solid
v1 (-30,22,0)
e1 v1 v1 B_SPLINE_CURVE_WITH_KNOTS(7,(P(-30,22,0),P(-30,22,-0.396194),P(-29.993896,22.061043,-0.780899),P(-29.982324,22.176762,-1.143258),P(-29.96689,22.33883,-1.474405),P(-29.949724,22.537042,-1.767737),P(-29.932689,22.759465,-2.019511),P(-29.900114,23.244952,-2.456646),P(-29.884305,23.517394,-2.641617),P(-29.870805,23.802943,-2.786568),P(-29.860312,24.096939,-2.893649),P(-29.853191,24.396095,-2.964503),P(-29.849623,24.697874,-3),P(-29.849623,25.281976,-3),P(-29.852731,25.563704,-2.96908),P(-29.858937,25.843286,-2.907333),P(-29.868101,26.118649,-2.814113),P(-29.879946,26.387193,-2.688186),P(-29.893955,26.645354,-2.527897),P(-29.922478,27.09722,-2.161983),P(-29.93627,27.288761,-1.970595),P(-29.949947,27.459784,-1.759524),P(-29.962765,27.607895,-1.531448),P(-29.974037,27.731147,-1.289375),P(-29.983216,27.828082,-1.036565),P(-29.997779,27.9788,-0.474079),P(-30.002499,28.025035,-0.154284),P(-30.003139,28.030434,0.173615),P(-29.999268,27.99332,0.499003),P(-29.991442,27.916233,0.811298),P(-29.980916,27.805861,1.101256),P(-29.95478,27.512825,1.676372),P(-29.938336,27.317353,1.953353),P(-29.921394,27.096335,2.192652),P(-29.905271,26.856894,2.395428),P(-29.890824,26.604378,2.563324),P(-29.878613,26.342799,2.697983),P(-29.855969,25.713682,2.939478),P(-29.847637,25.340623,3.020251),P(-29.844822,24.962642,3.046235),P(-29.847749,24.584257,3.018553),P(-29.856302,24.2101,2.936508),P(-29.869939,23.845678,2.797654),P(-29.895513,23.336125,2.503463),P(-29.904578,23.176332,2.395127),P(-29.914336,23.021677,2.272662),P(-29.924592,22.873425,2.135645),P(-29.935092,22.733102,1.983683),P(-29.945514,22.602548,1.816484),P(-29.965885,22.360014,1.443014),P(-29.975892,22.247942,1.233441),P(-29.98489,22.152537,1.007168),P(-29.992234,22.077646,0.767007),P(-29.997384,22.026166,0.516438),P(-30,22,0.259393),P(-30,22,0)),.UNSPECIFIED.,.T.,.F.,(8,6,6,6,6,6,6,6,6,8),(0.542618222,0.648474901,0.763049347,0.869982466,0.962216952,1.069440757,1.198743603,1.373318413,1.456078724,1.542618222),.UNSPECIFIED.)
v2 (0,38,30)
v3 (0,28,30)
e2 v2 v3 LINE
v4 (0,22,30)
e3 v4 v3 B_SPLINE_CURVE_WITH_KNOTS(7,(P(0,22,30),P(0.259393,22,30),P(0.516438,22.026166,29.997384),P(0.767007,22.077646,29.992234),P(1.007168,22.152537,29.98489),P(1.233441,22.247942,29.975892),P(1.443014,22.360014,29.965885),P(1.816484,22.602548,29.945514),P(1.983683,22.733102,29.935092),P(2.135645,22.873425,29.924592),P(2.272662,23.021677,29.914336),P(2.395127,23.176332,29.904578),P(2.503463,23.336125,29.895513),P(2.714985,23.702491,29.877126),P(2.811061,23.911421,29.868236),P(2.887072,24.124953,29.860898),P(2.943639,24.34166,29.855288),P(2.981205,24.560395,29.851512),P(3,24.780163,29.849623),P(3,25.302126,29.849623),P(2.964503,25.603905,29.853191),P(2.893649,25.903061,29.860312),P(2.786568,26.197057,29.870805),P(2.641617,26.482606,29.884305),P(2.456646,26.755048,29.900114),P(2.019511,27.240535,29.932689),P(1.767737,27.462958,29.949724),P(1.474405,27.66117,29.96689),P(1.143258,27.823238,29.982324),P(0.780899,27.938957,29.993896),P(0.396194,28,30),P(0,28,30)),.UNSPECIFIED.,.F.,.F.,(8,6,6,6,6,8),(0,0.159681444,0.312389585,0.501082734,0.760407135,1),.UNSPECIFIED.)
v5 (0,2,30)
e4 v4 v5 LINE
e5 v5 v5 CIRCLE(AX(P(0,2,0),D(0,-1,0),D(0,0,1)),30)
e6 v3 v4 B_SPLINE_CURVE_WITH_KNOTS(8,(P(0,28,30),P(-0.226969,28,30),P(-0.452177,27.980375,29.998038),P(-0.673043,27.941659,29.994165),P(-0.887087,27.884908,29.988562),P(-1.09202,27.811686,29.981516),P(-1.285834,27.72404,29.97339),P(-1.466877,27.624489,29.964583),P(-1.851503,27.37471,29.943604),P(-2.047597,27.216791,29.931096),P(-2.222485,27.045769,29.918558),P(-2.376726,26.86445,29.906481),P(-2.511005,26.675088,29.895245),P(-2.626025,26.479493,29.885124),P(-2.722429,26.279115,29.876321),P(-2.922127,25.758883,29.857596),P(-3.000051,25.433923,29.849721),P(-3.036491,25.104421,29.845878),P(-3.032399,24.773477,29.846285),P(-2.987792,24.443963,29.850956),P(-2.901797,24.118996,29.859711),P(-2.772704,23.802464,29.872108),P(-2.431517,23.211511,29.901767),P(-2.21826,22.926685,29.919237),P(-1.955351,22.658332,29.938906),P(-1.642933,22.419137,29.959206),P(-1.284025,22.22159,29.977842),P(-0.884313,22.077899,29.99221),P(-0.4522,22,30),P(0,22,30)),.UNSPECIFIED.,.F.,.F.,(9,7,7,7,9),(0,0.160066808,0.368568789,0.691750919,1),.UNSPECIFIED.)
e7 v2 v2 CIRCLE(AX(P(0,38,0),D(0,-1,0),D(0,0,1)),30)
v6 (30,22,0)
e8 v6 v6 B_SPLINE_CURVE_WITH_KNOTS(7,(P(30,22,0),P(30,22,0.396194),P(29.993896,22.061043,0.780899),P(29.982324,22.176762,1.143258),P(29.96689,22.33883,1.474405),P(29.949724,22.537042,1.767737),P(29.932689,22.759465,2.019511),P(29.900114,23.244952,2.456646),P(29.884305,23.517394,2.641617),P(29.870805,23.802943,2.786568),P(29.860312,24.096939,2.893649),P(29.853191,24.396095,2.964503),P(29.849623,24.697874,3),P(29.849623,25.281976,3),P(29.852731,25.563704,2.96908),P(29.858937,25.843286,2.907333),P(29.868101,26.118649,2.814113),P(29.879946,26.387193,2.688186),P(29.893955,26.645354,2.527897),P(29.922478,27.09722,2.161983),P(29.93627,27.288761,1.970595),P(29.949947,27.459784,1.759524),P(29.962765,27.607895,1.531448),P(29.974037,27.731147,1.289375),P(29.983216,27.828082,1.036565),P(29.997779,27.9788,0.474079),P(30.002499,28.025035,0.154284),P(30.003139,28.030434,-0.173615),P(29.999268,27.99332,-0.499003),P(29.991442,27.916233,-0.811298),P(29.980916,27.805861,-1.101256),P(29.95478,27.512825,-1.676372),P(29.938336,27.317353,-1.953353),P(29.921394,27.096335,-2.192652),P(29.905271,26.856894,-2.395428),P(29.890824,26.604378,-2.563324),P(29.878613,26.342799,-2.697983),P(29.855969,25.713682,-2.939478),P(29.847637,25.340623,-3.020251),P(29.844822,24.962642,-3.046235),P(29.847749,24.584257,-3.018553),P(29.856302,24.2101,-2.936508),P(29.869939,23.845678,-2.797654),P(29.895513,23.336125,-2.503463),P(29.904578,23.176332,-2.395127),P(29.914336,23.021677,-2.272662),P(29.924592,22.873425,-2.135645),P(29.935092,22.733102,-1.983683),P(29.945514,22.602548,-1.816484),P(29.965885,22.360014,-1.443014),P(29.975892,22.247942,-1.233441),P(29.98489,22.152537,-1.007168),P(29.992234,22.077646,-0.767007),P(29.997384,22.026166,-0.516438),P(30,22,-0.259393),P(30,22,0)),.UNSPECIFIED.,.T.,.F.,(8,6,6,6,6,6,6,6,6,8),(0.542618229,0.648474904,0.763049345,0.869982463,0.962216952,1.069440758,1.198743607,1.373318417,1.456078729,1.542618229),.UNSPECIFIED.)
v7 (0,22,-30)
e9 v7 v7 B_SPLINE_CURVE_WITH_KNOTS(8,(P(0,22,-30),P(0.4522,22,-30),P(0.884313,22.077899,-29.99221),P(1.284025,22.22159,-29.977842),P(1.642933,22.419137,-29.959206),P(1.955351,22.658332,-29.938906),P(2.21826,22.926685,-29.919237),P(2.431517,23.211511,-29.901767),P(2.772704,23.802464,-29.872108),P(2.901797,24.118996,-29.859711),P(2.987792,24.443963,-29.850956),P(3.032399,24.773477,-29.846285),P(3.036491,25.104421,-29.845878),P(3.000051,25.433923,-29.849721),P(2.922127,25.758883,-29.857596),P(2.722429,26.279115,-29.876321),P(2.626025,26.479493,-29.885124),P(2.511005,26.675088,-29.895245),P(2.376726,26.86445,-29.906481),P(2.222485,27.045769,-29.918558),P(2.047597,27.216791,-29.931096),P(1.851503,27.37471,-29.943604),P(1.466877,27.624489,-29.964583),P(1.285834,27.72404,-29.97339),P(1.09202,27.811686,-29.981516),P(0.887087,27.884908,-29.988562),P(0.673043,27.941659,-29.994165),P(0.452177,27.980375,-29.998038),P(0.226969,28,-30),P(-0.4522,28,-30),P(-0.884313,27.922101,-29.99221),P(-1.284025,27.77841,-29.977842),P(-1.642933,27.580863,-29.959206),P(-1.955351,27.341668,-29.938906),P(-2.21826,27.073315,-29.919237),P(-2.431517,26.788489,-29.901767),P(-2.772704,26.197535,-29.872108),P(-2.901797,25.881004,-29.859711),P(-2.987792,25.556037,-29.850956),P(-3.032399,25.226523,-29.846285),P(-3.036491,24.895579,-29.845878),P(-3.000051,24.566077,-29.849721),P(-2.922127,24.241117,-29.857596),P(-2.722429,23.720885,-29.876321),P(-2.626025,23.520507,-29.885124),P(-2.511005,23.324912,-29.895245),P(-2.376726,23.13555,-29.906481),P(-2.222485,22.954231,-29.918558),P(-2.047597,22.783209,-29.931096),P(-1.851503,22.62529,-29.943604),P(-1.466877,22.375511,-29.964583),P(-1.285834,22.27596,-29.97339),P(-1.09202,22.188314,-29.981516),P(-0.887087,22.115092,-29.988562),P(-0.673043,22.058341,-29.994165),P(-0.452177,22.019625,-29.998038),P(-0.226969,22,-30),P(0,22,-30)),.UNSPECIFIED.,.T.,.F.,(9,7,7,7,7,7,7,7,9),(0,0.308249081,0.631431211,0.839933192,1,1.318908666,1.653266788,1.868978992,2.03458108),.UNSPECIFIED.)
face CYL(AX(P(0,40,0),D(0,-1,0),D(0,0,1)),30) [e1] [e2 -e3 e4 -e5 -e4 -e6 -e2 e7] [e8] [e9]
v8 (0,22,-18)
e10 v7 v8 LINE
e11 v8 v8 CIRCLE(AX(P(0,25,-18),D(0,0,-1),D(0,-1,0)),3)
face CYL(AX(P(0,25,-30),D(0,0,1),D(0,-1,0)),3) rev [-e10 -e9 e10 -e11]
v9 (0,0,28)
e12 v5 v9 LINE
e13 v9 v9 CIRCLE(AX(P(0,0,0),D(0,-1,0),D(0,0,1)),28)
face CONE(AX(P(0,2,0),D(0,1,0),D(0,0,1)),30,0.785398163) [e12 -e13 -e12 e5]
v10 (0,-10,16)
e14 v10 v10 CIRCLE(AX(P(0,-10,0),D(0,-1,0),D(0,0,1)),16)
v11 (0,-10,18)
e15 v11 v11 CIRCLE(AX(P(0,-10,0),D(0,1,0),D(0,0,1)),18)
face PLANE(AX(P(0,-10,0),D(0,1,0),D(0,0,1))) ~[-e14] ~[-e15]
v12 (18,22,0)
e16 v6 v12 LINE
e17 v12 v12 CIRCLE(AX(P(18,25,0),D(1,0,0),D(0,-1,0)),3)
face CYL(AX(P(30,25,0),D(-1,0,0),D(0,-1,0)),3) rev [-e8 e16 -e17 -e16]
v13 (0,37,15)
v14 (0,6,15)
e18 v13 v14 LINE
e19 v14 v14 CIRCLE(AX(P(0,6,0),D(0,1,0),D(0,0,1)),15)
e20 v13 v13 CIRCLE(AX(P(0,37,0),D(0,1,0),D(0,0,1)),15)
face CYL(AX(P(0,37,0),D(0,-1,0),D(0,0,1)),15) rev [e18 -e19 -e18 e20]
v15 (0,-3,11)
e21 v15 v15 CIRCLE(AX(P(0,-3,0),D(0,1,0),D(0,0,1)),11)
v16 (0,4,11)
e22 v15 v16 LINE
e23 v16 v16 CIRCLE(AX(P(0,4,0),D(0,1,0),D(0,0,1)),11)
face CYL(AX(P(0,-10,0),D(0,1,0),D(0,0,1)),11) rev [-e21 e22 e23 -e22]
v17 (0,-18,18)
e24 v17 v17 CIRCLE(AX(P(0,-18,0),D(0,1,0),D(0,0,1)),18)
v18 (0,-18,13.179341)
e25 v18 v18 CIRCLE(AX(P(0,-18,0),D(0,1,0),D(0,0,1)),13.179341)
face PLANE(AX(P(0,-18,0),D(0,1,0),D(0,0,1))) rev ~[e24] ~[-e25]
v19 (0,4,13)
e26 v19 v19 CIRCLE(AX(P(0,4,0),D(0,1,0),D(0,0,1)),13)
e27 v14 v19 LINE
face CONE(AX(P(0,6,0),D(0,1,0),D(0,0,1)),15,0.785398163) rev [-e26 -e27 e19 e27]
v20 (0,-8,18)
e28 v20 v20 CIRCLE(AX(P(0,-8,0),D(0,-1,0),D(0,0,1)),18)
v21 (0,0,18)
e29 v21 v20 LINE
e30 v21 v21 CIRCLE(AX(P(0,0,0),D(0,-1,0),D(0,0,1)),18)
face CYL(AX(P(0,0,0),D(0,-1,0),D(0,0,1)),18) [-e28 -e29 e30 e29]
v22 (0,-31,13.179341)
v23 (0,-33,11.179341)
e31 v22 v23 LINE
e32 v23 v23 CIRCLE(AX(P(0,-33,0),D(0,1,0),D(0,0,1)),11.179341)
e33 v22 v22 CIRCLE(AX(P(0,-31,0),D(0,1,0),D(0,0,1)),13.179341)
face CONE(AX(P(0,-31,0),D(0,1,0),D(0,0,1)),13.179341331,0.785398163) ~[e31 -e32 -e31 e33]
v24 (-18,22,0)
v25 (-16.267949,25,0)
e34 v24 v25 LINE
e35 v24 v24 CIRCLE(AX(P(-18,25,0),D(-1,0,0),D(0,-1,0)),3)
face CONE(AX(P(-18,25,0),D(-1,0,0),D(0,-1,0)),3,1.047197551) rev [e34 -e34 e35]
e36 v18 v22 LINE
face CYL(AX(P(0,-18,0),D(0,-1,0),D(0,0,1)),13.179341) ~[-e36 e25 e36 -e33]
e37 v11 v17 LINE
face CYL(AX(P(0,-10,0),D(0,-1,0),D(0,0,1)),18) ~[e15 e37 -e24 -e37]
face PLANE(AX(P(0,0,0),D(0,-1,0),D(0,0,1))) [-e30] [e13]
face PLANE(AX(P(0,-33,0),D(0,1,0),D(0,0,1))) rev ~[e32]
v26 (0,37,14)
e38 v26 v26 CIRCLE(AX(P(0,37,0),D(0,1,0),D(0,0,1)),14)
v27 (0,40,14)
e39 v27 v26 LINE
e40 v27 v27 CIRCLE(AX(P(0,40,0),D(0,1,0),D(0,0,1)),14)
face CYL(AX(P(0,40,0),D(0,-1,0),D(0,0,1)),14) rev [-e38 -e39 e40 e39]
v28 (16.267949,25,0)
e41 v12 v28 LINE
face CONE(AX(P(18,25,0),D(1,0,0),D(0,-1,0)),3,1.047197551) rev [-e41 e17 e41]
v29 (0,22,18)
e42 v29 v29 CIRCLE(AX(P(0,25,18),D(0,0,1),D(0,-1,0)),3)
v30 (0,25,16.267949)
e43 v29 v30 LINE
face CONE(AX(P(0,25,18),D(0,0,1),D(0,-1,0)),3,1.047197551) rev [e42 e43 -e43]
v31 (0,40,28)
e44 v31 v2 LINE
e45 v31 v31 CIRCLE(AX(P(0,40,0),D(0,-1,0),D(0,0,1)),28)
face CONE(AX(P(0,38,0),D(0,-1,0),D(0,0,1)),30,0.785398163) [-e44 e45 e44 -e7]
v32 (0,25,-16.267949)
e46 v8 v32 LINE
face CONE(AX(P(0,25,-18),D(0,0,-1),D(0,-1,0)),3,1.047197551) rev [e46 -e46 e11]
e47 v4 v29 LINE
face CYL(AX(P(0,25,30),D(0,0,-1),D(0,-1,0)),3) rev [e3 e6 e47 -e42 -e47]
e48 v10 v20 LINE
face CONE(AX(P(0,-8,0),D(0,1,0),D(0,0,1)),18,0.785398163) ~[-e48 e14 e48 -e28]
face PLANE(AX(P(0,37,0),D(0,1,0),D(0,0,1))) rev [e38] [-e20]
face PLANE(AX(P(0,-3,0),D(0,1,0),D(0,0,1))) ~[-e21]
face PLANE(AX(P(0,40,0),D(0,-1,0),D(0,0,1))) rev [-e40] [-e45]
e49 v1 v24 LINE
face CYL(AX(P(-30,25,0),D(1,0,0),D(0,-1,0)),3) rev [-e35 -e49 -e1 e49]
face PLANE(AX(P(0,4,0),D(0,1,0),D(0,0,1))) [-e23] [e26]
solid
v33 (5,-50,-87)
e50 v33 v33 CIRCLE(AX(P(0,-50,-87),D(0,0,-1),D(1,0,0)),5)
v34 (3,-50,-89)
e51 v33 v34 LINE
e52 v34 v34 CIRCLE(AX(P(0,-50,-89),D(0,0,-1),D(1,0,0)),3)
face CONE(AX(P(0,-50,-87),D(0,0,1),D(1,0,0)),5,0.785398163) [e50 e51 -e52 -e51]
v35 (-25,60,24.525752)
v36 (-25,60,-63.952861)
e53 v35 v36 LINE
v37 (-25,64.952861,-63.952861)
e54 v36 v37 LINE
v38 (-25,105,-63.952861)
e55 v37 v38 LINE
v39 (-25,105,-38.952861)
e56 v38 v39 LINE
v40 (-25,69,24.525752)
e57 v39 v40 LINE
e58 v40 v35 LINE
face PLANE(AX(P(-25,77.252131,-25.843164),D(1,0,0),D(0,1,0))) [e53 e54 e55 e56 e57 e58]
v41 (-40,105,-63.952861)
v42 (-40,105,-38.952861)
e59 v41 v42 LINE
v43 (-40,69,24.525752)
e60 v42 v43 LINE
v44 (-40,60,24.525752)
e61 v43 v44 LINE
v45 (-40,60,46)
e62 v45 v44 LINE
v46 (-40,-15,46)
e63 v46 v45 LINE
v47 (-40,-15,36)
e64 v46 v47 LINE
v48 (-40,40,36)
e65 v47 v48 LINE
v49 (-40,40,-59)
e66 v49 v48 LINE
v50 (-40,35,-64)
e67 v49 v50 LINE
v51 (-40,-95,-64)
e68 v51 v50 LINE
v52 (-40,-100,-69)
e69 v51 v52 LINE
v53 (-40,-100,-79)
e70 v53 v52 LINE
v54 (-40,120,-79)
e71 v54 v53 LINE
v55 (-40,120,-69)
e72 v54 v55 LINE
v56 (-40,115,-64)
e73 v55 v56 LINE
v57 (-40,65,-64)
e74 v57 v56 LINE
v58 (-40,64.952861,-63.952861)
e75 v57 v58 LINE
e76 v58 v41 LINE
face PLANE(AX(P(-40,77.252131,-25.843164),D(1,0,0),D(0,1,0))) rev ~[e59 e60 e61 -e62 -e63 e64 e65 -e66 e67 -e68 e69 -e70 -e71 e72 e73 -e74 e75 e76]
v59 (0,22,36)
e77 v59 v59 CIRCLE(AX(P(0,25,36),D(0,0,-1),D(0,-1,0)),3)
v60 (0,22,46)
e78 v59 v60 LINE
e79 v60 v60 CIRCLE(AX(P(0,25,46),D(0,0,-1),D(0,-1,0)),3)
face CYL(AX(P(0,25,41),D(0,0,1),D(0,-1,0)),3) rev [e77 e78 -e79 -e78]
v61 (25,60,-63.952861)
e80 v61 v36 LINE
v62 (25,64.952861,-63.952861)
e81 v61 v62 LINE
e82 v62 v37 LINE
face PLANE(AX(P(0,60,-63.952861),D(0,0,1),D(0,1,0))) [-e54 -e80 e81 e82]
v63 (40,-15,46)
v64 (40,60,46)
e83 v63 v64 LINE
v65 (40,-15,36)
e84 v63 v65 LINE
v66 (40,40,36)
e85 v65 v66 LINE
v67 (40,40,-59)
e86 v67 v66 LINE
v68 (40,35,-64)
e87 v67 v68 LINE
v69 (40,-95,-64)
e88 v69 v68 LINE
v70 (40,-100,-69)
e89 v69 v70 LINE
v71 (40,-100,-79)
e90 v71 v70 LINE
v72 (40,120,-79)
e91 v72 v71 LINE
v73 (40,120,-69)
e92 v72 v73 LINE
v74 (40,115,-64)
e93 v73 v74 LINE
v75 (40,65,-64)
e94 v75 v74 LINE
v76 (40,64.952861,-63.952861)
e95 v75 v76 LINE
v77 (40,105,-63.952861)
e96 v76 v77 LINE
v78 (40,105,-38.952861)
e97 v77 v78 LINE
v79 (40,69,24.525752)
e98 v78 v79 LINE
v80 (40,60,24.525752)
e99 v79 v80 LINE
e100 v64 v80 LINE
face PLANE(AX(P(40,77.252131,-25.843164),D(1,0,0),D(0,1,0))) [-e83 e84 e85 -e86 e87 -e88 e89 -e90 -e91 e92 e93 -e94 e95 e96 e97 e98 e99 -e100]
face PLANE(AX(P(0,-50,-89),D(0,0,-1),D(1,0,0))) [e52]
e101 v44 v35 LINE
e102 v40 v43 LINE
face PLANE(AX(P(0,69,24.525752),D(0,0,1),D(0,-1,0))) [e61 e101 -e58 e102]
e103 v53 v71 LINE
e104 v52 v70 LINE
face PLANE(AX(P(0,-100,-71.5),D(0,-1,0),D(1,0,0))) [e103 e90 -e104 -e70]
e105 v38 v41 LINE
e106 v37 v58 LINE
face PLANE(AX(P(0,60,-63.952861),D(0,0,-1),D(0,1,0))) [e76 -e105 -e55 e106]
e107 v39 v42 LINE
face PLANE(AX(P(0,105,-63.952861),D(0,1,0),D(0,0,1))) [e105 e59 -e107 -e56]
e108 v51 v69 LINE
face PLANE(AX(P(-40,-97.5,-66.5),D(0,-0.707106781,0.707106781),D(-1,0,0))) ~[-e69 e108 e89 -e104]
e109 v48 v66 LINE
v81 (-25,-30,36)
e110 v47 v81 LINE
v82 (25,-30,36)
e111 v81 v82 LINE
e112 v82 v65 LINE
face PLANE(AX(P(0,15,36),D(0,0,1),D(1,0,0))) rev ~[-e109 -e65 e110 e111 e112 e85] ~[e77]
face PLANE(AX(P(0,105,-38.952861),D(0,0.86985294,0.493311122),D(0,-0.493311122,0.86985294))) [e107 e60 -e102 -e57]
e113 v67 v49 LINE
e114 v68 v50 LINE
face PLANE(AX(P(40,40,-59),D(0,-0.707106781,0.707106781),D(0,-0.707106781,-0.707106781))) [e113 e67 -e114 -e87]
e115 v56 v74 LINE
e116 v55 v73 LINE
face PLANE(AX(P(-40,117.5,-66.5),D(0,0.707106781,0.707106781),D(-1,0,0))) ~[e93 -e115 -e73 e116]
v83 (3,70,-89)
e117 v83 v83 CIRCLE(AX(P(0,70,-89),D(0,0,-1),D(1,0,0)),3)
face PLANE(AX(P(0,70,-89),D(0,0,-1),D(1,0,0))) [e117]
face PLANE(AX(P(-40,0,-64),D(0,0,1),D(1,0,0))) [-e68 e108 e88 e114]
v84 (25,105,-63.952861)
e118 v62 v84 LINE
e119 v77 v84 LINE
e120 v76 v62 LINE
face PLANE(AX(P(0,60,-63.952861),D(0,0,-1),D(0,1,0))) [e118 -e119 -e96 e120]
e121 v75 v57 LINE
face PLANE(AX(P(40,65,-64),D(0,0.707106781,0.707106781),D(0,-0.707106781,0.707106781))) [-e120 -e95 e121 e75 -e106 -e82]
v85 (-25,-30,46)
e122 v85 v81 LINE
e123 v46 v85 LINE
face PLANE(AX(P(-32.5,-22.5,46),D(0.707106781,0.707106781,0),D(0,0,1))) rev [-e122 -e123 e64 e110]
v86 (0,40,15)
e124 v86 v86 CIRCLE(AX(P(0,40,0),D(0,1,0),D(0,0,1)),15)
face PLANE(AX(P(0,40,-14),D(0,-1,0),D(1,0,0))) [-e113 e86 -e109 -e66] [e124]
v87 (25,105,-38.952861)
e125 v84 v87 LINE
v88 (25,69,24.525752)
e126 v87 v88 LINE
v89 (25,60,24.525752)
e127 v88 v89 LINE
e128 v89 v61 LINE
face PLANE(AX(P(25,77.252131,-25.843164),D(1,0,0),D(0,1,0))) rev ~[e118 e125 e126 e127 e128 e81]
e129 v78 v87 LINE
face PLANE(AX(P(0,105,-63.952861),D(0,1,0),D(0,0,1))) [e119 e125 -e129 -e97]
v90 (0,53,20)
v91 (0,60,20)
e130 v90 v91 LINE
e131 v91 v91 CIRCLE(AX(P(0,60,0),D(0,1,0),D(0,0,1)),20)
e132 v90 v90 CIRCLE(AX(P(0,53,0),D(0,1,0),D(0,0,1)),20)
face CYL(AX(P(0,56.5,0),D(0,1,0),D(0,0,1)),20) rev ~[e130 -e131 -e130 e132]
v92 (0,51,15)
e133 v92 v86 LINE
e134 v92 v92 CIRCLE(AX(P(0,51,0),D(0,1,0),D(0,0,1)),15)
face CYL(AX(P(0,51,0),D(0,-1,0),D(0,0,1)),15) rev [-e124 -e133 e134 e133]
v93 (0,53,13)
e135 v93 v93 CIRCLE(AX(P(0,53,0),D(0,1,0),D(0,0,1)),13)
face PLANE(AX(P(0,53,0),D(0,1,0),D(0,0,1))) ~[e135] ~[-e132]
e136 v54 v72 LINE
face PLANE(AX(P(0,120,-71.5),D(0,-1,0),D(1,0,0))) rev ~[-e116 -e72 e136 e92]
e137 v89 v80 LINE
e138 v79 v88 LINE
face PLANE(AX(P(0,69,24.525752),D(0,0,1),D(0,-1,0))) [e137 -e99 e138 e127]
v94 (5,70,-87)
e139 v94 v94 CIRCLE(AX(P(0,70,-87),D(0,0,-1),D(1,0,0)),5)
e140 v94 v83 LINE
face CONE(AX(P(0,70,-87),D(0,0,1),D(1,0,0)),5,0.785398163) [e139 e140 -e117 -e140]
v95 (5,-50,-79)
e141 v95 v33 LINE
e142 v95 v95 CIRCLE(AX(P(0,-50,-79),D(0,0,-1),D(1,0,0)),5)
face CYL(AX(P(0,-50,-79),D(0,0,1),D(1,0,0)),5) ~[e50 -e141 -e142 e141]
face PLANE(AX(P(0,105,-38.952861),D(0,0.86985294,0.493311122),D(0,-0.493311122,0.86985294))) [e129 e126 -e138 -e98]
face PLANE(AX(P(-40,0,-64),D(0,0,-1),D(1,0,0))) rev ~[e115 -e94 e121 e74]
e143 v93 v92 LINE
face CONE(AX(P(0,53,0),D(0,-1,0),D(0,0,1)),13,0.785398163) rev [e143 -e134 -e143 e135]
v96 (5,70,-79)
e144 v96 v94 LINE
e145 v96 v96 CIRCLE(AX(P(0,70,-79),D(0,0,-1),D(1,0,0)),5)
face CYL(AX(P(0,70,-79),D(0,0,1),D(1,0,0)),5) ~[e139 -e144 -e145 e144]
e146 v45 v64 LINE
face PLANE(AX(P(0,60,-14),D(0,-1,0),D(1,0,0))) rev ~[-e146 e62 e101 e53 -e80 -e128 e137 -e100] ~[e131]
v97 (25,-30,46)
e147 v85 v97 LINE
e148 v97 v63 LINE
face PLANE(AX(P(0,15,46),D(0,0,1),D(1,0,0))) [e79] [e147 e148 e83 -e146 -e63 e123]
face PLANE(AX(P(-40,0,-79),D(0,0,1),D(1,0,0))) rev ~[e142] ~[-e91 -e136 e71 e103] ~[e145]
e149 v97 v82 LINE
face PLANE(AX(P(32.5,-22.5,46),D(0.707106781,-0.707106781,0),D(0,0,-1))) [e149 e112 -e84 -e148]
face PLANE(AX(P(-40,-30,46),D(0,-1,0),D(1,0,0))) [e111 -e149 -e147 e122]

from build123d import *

# Parameters (mm, degrees)
F2_SIZE         = 2
F4_COPIES_COUNT = 4
F6_W            = 2
F6_H            = 10
F8_W            = 80
F8_H            = 90
F8_R            = 5
F9_DEPTH        = 10
F10_SIZE        = 15
F12_W           = 80
F12_H           = 100
F13_DEPTH       = 20
F15_DEPTH       = 80
F17_W           = 80
F17_H           = 15
F18_DEPTH       = 120
F18_DEPTH_BACK  = 100
F19_SIZE        = 5
F20_R           = 5
F21_DEPTH       = 10
F22_SIZE        = 2
F23_DEPTH       = 40
F23_DEPTH_BACK  = 40
F24_DEPTH       = 25
F24_DEPTH_BACK  = 25
F25_W           = 7
F25_H           = 20
F31_SIZE        = 2


# Not quite as in the source:
# - a pattern or mirror of a feature is missing from the dataset's text; its kind, count and spacing are read off the source's solid


with BuildPart() as f1:
    # F0 (on Right) → F1 (revolve)
    with BuildSketch(Plane.YZ):
        Polygon((-10, 18), (-10, 11), (40, 11), (40, 30), (0, 30), (0, 18), align=None)
    revolve(axis=Axis((0, 15, 0), (0, -1, 0)))

    # F2
    f2_edges = [f1.edges().sort_by_distance(p)[0] for p in [
        (0, -10, -18),
        (0, 0, -30),
        (0, 40, -30),
    ]]
    chamfer(f2_edges, length=F2_SIZE)

    # F3 (on Right) → F4 (revolve, cut)
    with BuildSketch(Plane.YZ):
        Polygon((22, 18), (25, 16.2679491924), (25, 30), (22, 30), align=None)
    f4 = revolve(axis=Axis((0, 25, 23.1339745962), (0, 0, 1)), mode=Mode.SUBTRACT)

    # F4_copies: F4 ×4 about axis
    f4_copies_axis = Axis((0, 0, 0), (0, 1, 0))
    for i in range(1, F4_COPIES_COUNT):
        add(f4.rotate(f4_copies_axis, i * 360 / F4_COPIES_COUNT), mode=Mode.SUBTRACT)


with BuildPart() as f7:
    # F6 (on Right) → F7 (revolve)
    with BuildSketch(Plane.YZ):
        with Locations((21, 41)):
            Rectangle(F6_W, F6_H)
    revolve(axis=Axis((0, 25, 40.9752885997), (0, 0, -1)))

    # F8 (on offset) → F9 (join)
    with BuildSketch(Plane.XY.offset(46)):
        with Locations((0, 15)):
            Rectangle(F8_W, F8_H)
        with Locations((0, 25)):
            Circle(F8_R, mode=Mode.SUBTRACT)
    extrude(amount=-F9_DEPTH)

    # F10
    f10_edges = [f7.edges().sort_by_distance(p)[0] for p in [
        (-40, -30, 41),
        (40, -30, 41),
    ]]
    chamfer(f10_edges, length=F10_SIZE)

    # F12 (on offset) → F13 (join)
    with BuildSketch(Plane.XZ.offset(-60)):
        with Locations((0, -14)):
            Rectangle(F12_W, F12_H)
    extrude(amount=F13_DEPTH)

    # F14 (on face) → F15 (join)
    with BuildSketch(Plane.YZ.offset(40)):
        Polygon((35, -64), (40, -64), (40, -59), align=None)
        Polygon((60, -59), (60, -64), (65, -64), align=None)
    extrude(amount=-F15_DEPTH)

    # F17 (on Front) → F18 (join, two sides)
    with BuildSketch(Plane.XZ) as f18_sk:
        with Locations((0, -71.5)):
            Rectangle(F17_W, F17_H)
    extrude(amount=-F18_DEPTH)
    extrude(f18_sk.sketch, amount=F18_DEPTH_BACK)

    # F19
    f19_edges = [f7.edges().sort_by_distance(p)[0] for p in [
        (0, 120, -64),
        (0, -100, -64),
    ]]
    chamfer(f19_edges, length=F19_SIZE)

    # F20 (on face) → F21 (join)
    with BuildSketch(Plane(origin=(0, 0, -79), x_dir=(1, 0, 0), z_dir=(0, 0, -1))):
        with Locations((0, 50)):
            Circle(F20_R)
        with Locations((0, -70)):
            Circle(F20_R)
    extrude(amount=F21_DEPTH)

    # F22
    f22_edges = [f7.edges().sort_by_distance(p)[0] for p in [
        (-5, -50, -89),
        (-5, 70, -89),
    ]]
    chamfer(f22_edges, length=F22_SIZE)

    # F16 (on Right) → F23 (join, two sides)
    with BuildSketch(Plane.YZ) as f23_sk:
        Polygon((69, 24.5257518999), (60, 24.5257518999), (60, -63.9528611181), (105, -63.9528611181), (105, -38.9528611181), align=None)
    extrude(amount=F23_DEPTH)
    extrude(f23_sk.sketch, amount=-F23_DEPTH_BACK)

    # F16 (on Right) → F24 (cut, two sides)
    with BuildSketch(Plane.YZ) as f24_sk:
        Polygon((69, 24.5257518999), (60, 24.5257518999), (60, -63.9528611181), (105, -63.9528611181), (105, -38.9528611181), align=None)
    extrude(amount=F24_DEPTH, mode=Mode.SUBTRACT)
    extrude(f24_sk.sketch, amount=-F24_DEPTH_BACK, mode=Mode.SUBTRACT)

    # F25 (on Right) → F26 (revolve, cut)
    with BuildSketch(Plane.YZ):
        with Locations((56.5, 10)):
            Rectangle(F25_W, F25_H)
    revolve(axis=Axis((0, 56.5, 0), (0, 1, 0)), mode=Mode.SUBTRACT)


with BuildPart() as f28_tool:
    # F27 (on Right) → F28 (revolve)
    with BuildSketch(Plane.YZ):
        Polygon((53, 13), (51, 15), (40, 15), (40, 14), (37, 14), (37, 15), (6, 15), (4, 13), (4, 0), (53, 0), align=None)
    revolve(axis=Axis((0, 28.5, 0), (0, 1, 0)))


with BuildPart() as f1_1:
    add(f1.part)

    # F28: cut by f28_tool
    add(f28_tool.part, mode=Mode.SUBTRACT)

    # F29 (on Right) → F30 (revolve)
    with BuildSketch(Plane.YZ):
        Polygon((-18, 18), (-18, 13.1793413311), (-33, 13.1793413311), (-33, 0), (-3, 0), (-3, 11), (-10, 11), (-10, 18), align=None)
    revolve(axis=Axis((0, -18, 0), (0, 1, 0)))

    # F31
    f31_edges = [f1_1.edges().sort_by_distance(p)[0] for p in [
        (0, -33, -13.179341),
    ]]
    chamfer(f31_edges, length=F31_SIZE)


with BuildPart() as f7_1:
    add(f7.part)

    # F28: cut by f28_tool
    add(f28_tool.part, mode=Mode.SUBTRACT)


solid = Compound([f1_1.part, f7_1.part])
